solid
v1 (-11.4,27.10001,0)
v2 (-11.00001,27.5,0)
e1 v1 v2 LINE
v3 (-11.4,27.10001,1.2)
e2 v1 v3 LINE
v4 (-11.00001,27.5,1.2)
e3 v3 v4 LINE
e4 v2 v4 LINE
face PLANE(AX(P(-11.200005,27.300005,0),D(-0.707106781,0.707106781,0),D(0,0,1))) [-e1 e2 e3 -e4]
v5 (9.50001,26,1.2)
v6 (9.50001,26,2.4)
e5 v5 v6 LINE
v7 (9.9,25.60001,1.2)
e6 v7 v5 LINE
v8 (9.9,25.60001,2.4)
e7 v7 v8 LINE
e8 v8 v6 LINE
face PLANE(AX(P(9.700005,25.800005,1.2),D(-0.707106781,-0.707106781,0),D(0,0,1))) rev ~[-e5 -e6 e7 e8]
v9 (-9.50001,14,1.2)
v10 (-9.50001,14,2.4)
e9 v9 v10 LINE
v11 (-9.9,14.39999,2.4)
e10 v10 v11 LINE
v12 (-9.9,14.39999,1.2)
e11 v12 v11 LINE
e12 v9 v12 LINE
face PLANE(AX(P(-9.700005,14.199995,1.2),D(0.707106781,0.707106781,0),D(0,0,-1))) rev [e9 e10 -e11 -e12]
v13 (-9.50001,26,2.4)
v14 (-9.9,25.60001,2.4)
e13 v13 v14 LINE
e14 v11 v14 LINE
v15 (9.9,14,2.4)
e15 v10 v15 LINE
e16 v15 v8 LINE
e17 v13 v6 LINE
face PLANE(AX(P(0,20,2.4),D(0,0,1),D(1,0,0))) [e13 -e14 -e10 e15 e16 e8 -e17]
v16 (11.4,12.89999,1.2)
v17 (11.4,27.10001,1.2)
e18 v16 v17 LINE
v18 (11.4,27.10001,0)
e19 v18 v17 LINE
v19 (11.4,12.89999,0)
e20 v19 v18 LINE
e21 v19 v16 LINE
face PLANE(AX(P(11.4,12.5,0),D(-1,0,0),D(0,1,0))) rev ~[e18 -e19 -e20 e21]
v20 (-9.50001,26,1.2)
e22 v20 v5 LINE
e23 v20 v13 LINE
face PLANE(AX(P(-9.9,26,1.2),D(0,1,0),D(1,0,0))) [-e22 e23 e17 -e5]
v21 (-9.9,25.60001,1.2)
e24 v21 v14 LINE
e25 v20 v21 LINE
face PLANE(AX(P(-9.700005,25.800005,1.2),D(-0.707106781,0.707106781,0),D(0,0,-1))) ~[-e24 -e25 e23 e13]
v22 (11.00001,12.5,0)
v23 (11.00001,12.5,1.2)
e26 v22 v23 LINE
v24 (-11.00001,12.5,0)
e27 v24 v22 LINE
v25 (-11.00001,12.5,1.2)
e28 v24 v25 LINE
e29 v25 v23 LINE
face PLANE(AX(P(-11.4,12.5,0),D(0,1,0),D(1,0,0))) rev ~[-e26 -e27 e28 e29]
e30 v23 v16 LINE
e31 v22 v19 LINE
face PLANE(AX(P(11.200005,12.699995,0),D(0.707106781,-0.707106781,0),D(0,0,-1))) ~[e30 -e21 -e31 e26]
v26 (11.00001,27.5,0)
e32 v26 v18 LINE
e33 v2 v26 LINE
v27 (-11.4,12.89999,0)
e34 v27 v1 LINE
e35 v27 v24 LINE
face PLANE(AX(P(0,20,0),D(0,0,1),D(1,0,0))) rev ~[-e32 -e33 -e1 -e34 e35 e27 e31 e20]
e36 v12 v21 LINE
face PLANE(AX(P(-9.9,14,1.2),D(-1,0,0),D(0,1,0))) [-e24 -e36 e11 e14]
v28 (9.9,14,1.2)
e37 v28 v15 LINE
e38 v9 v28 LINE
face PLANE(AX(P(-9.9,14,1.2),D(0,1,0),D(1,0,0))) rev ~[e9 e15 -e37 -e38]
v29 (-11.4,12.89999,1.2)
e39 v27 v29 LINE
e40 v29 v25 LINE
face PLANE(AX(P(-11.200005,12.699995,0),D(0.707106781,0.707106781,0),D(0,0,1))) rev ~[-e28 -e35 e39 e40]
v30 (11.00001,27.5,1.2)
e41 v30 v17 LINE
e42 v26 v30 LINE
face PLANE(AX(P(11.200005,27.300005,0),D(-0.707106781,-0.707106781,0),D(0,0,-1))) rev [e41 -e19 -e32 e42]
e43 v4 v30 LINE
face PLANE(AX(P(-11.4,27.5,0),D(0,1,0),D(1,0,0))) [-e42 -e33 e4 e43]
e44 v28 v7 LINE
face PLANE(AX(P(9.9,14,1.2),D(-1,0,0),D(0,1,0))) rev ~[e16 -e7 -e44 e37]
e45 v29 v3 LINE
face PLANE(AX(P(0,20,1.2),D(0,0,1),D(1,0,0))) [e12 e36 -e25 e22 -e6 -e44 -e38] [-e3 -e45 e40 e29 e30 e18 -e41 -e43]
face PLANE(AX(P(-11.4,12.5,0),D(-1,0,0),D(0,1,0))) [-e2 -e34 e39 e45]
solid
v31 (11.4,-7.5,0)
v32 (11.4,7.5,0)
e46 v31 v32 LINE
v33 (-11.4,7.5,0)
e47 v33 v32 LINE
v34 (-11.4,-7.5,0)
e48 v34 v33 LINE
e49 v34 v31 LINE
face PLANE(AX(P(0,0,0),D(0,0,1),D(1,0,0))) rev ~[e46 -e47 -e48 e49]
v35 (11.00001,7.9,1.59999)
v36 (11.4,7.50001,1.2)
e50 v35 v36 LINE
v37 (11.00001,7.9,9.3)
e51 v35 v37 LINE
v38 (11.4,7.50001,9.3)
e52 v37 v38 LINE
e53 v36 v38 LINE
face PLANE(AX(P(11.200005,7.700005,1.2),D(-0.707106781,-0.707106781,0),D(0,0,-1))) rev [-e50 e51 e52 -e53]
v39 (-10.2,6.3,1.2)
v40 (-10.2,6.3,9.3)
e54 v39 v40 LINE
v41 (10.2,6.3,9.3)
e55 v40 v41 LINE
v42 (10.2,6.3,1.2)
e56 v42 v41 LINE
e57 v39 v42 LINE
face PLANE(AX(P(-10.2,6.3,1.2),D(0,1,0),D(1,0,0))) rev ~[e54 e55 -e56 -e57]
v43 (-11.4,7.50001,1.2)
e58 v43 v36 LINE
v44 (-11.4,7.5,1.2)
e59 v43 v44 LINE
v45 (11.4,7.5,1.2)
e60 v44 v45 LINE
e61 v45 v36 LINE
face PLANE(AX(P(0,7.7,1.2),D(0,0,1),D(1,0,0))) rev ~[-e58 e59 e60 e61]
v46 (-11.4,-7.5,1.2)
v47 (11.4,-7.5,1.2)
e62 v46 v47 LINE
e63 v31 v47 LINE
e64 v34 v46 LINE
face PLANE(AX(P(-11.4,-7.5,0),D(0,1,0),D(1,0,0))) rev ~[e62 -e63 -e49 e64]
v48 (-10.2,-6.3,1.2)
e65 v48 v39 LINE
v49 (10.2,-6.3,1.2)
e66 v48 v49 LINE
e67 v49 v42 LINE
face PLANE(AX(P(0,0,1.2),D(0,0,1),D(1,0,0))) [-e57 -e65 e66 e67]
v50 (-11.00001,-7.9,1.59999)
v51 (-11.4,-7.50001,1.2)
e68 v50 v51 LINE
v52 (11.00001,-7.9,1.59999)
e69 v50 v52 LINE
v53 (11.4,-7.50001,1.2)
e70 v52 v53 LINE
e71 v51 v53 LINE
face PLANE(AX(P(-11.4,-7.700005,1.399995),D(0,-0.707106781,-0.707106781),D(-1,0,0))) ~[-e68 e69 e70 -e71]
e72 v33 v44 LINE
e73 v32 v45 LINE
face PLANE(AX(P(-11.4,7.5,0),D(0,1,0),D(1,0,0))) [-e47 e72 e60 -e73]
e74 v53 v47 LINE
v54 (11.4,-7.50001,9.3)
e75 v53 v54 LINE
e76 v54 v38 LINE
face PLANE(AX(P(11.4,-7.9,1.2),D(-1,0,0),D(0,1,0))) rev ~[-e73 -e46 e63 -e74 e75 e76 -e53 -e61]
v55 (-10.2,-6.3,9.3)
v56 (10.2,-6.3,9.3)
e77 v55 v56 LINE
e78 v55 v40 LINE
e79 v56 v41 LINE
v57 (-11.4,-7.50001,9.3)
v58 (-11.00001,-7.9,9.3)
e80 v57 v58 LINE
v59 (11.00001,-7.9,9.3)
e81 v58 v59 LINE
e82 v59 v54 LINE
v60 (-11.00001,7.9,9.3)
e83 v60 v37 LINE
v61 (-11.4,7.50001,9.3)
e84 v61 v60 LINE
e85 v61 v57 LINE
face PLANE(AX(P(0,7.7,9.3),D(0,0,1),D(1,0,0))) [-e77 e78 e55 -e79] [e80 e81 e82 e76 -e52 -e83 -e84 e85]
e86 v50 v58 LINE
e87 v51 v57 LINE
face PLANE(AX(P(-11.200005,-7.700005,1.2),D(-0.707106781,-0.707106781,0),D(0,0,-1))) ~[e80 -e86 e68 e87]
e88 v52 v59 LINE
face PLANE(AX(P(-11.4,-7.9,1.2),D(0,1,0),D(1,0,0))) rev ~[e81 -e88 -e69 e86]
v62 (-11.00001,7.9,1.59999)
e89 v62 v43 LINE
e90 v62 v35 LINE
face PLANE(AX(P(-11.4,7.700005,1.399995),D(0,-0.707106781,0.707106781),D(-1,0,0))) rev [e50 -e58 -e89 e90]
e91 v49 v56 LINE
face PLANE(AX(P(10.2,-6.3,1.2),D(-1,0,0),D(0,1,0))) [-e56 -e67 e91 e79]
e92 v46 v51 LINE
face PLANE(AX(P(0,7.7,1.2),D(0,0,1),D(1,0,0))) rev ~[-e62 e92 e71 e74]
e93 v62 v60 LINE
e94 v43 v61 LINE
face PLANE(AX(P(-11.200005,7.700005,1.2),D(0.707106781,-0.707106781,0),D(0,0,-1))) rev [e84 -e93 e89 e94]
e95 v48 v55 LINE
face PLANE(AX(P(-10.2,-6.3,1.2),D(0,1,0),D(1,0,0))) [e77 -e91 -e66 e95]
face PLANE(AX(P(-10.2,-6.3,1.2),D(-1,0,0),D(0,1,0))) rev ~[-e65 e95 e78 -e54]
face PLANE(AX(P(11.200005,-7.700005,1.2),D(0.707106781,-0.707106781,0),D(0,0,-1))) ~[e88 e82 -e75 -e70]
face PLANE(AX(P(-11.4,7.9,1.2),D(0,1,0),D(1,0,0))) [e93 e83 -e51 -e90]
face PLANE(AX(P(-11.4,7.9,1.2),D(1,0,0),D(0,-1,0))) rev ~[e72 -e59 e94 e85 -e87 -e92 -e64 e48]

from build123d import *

# Parameters (mm, degrees)
F0_W      = 22.8
F0_H      = 15
F1_DEPTH  = 1.2
F2_W      = 22.8
F2_H      = 0.4
F2_H_2    = 15
F2_W_2    = 20.4
F2_H_3    = 12.6
F3_DEPTH  = 8.1
F4_W      = 19.8
F4_H      = 12
F5_DEPTH  = 1.2
F6_SIZE   = 0.39999
F6_2_SIZE = 0.39999


# Not quite as in the source:
# - a fillet or chamfer is up to 0.001 mm smaller than in the source, because OpenCascade refuses the exact size


with BuildPart() as f1:
    # F0 (on Top) → F1 (new body)
    with BuildSketch(Plane.XY):
        Rectangle(F0_W, F0_H)
    extrude(amount=F1_DEPTH)

    # F2 (on face) → F3 (join)
    with BuildSketch(Plane.XY.offset(1.2)):
        with Locations((0, 7.7)):
            Rectangle(F2_W, F2_H)
        Rectangle(F2_W, F2_H_2)
        Rectangle(F2_W_2, F2_H_3, mode=Mode.SUBTRACT)
        with Locations((0, -7.7)):
            Rectangle(F2_W, F2_H)
    extrude(amount=F3_DEPTH)

    # F6 (size 0.4 in the source; OpenCascade refuses exactly that, so slightly less here)
    f6_edges = [f1.edges().sort_by_distance(p)[0] for p in [
        (0, -7.9, 1.2),
        (11.4, -7.9, 5.25),
        (-11.4, -7.9, 5.25),
        (11.4, 7.9, 5.25),
        (0, 7.9, 1.2),
        (-11.4, 7.9, 5.25),
    ]]
    chamfer(f6_edges, length=F6_SIZE)


with BuildPart() as f1b:
    # F0 (on Top) → F1, piece 2 (new body)
    with BuildSketch(Plane.XY):
        with Locations((0, 20)):
            Rectangle(F0_W, F0_H)
    extrude(amount=F1_DEPTH)

    # F4 (on face) → F5 (join)
    with BuildSketch(Plane.XY.offset(1.2)):
        with Locations((0, 20)):
            Rectangle(F4_W, F4_H)
    extrude(amount=F5_DEPTH)

    # F6#2 (size 0.4 in the source; OpenCascade refuses exactly that, so slightly less here)
    f6_2_edges = [f1b.edges().sort_by_distance(p)[0] for p in [
        (11.4, 12.5, 0.6),
        (-11.4, 12.5, 0.6),
        (-11.4, 27.5, 0.6),
        (-9.9, 26, 1.8),
        (-9.9, 14, 1.8),
        (11.4, 27.5, 0.6),
        (9.9, 26, 1.8),
    ]]
    chamfer(f6_2_edges, length=F6_2_SIZE)


solid = Compound([f1.part, f1b.part])
